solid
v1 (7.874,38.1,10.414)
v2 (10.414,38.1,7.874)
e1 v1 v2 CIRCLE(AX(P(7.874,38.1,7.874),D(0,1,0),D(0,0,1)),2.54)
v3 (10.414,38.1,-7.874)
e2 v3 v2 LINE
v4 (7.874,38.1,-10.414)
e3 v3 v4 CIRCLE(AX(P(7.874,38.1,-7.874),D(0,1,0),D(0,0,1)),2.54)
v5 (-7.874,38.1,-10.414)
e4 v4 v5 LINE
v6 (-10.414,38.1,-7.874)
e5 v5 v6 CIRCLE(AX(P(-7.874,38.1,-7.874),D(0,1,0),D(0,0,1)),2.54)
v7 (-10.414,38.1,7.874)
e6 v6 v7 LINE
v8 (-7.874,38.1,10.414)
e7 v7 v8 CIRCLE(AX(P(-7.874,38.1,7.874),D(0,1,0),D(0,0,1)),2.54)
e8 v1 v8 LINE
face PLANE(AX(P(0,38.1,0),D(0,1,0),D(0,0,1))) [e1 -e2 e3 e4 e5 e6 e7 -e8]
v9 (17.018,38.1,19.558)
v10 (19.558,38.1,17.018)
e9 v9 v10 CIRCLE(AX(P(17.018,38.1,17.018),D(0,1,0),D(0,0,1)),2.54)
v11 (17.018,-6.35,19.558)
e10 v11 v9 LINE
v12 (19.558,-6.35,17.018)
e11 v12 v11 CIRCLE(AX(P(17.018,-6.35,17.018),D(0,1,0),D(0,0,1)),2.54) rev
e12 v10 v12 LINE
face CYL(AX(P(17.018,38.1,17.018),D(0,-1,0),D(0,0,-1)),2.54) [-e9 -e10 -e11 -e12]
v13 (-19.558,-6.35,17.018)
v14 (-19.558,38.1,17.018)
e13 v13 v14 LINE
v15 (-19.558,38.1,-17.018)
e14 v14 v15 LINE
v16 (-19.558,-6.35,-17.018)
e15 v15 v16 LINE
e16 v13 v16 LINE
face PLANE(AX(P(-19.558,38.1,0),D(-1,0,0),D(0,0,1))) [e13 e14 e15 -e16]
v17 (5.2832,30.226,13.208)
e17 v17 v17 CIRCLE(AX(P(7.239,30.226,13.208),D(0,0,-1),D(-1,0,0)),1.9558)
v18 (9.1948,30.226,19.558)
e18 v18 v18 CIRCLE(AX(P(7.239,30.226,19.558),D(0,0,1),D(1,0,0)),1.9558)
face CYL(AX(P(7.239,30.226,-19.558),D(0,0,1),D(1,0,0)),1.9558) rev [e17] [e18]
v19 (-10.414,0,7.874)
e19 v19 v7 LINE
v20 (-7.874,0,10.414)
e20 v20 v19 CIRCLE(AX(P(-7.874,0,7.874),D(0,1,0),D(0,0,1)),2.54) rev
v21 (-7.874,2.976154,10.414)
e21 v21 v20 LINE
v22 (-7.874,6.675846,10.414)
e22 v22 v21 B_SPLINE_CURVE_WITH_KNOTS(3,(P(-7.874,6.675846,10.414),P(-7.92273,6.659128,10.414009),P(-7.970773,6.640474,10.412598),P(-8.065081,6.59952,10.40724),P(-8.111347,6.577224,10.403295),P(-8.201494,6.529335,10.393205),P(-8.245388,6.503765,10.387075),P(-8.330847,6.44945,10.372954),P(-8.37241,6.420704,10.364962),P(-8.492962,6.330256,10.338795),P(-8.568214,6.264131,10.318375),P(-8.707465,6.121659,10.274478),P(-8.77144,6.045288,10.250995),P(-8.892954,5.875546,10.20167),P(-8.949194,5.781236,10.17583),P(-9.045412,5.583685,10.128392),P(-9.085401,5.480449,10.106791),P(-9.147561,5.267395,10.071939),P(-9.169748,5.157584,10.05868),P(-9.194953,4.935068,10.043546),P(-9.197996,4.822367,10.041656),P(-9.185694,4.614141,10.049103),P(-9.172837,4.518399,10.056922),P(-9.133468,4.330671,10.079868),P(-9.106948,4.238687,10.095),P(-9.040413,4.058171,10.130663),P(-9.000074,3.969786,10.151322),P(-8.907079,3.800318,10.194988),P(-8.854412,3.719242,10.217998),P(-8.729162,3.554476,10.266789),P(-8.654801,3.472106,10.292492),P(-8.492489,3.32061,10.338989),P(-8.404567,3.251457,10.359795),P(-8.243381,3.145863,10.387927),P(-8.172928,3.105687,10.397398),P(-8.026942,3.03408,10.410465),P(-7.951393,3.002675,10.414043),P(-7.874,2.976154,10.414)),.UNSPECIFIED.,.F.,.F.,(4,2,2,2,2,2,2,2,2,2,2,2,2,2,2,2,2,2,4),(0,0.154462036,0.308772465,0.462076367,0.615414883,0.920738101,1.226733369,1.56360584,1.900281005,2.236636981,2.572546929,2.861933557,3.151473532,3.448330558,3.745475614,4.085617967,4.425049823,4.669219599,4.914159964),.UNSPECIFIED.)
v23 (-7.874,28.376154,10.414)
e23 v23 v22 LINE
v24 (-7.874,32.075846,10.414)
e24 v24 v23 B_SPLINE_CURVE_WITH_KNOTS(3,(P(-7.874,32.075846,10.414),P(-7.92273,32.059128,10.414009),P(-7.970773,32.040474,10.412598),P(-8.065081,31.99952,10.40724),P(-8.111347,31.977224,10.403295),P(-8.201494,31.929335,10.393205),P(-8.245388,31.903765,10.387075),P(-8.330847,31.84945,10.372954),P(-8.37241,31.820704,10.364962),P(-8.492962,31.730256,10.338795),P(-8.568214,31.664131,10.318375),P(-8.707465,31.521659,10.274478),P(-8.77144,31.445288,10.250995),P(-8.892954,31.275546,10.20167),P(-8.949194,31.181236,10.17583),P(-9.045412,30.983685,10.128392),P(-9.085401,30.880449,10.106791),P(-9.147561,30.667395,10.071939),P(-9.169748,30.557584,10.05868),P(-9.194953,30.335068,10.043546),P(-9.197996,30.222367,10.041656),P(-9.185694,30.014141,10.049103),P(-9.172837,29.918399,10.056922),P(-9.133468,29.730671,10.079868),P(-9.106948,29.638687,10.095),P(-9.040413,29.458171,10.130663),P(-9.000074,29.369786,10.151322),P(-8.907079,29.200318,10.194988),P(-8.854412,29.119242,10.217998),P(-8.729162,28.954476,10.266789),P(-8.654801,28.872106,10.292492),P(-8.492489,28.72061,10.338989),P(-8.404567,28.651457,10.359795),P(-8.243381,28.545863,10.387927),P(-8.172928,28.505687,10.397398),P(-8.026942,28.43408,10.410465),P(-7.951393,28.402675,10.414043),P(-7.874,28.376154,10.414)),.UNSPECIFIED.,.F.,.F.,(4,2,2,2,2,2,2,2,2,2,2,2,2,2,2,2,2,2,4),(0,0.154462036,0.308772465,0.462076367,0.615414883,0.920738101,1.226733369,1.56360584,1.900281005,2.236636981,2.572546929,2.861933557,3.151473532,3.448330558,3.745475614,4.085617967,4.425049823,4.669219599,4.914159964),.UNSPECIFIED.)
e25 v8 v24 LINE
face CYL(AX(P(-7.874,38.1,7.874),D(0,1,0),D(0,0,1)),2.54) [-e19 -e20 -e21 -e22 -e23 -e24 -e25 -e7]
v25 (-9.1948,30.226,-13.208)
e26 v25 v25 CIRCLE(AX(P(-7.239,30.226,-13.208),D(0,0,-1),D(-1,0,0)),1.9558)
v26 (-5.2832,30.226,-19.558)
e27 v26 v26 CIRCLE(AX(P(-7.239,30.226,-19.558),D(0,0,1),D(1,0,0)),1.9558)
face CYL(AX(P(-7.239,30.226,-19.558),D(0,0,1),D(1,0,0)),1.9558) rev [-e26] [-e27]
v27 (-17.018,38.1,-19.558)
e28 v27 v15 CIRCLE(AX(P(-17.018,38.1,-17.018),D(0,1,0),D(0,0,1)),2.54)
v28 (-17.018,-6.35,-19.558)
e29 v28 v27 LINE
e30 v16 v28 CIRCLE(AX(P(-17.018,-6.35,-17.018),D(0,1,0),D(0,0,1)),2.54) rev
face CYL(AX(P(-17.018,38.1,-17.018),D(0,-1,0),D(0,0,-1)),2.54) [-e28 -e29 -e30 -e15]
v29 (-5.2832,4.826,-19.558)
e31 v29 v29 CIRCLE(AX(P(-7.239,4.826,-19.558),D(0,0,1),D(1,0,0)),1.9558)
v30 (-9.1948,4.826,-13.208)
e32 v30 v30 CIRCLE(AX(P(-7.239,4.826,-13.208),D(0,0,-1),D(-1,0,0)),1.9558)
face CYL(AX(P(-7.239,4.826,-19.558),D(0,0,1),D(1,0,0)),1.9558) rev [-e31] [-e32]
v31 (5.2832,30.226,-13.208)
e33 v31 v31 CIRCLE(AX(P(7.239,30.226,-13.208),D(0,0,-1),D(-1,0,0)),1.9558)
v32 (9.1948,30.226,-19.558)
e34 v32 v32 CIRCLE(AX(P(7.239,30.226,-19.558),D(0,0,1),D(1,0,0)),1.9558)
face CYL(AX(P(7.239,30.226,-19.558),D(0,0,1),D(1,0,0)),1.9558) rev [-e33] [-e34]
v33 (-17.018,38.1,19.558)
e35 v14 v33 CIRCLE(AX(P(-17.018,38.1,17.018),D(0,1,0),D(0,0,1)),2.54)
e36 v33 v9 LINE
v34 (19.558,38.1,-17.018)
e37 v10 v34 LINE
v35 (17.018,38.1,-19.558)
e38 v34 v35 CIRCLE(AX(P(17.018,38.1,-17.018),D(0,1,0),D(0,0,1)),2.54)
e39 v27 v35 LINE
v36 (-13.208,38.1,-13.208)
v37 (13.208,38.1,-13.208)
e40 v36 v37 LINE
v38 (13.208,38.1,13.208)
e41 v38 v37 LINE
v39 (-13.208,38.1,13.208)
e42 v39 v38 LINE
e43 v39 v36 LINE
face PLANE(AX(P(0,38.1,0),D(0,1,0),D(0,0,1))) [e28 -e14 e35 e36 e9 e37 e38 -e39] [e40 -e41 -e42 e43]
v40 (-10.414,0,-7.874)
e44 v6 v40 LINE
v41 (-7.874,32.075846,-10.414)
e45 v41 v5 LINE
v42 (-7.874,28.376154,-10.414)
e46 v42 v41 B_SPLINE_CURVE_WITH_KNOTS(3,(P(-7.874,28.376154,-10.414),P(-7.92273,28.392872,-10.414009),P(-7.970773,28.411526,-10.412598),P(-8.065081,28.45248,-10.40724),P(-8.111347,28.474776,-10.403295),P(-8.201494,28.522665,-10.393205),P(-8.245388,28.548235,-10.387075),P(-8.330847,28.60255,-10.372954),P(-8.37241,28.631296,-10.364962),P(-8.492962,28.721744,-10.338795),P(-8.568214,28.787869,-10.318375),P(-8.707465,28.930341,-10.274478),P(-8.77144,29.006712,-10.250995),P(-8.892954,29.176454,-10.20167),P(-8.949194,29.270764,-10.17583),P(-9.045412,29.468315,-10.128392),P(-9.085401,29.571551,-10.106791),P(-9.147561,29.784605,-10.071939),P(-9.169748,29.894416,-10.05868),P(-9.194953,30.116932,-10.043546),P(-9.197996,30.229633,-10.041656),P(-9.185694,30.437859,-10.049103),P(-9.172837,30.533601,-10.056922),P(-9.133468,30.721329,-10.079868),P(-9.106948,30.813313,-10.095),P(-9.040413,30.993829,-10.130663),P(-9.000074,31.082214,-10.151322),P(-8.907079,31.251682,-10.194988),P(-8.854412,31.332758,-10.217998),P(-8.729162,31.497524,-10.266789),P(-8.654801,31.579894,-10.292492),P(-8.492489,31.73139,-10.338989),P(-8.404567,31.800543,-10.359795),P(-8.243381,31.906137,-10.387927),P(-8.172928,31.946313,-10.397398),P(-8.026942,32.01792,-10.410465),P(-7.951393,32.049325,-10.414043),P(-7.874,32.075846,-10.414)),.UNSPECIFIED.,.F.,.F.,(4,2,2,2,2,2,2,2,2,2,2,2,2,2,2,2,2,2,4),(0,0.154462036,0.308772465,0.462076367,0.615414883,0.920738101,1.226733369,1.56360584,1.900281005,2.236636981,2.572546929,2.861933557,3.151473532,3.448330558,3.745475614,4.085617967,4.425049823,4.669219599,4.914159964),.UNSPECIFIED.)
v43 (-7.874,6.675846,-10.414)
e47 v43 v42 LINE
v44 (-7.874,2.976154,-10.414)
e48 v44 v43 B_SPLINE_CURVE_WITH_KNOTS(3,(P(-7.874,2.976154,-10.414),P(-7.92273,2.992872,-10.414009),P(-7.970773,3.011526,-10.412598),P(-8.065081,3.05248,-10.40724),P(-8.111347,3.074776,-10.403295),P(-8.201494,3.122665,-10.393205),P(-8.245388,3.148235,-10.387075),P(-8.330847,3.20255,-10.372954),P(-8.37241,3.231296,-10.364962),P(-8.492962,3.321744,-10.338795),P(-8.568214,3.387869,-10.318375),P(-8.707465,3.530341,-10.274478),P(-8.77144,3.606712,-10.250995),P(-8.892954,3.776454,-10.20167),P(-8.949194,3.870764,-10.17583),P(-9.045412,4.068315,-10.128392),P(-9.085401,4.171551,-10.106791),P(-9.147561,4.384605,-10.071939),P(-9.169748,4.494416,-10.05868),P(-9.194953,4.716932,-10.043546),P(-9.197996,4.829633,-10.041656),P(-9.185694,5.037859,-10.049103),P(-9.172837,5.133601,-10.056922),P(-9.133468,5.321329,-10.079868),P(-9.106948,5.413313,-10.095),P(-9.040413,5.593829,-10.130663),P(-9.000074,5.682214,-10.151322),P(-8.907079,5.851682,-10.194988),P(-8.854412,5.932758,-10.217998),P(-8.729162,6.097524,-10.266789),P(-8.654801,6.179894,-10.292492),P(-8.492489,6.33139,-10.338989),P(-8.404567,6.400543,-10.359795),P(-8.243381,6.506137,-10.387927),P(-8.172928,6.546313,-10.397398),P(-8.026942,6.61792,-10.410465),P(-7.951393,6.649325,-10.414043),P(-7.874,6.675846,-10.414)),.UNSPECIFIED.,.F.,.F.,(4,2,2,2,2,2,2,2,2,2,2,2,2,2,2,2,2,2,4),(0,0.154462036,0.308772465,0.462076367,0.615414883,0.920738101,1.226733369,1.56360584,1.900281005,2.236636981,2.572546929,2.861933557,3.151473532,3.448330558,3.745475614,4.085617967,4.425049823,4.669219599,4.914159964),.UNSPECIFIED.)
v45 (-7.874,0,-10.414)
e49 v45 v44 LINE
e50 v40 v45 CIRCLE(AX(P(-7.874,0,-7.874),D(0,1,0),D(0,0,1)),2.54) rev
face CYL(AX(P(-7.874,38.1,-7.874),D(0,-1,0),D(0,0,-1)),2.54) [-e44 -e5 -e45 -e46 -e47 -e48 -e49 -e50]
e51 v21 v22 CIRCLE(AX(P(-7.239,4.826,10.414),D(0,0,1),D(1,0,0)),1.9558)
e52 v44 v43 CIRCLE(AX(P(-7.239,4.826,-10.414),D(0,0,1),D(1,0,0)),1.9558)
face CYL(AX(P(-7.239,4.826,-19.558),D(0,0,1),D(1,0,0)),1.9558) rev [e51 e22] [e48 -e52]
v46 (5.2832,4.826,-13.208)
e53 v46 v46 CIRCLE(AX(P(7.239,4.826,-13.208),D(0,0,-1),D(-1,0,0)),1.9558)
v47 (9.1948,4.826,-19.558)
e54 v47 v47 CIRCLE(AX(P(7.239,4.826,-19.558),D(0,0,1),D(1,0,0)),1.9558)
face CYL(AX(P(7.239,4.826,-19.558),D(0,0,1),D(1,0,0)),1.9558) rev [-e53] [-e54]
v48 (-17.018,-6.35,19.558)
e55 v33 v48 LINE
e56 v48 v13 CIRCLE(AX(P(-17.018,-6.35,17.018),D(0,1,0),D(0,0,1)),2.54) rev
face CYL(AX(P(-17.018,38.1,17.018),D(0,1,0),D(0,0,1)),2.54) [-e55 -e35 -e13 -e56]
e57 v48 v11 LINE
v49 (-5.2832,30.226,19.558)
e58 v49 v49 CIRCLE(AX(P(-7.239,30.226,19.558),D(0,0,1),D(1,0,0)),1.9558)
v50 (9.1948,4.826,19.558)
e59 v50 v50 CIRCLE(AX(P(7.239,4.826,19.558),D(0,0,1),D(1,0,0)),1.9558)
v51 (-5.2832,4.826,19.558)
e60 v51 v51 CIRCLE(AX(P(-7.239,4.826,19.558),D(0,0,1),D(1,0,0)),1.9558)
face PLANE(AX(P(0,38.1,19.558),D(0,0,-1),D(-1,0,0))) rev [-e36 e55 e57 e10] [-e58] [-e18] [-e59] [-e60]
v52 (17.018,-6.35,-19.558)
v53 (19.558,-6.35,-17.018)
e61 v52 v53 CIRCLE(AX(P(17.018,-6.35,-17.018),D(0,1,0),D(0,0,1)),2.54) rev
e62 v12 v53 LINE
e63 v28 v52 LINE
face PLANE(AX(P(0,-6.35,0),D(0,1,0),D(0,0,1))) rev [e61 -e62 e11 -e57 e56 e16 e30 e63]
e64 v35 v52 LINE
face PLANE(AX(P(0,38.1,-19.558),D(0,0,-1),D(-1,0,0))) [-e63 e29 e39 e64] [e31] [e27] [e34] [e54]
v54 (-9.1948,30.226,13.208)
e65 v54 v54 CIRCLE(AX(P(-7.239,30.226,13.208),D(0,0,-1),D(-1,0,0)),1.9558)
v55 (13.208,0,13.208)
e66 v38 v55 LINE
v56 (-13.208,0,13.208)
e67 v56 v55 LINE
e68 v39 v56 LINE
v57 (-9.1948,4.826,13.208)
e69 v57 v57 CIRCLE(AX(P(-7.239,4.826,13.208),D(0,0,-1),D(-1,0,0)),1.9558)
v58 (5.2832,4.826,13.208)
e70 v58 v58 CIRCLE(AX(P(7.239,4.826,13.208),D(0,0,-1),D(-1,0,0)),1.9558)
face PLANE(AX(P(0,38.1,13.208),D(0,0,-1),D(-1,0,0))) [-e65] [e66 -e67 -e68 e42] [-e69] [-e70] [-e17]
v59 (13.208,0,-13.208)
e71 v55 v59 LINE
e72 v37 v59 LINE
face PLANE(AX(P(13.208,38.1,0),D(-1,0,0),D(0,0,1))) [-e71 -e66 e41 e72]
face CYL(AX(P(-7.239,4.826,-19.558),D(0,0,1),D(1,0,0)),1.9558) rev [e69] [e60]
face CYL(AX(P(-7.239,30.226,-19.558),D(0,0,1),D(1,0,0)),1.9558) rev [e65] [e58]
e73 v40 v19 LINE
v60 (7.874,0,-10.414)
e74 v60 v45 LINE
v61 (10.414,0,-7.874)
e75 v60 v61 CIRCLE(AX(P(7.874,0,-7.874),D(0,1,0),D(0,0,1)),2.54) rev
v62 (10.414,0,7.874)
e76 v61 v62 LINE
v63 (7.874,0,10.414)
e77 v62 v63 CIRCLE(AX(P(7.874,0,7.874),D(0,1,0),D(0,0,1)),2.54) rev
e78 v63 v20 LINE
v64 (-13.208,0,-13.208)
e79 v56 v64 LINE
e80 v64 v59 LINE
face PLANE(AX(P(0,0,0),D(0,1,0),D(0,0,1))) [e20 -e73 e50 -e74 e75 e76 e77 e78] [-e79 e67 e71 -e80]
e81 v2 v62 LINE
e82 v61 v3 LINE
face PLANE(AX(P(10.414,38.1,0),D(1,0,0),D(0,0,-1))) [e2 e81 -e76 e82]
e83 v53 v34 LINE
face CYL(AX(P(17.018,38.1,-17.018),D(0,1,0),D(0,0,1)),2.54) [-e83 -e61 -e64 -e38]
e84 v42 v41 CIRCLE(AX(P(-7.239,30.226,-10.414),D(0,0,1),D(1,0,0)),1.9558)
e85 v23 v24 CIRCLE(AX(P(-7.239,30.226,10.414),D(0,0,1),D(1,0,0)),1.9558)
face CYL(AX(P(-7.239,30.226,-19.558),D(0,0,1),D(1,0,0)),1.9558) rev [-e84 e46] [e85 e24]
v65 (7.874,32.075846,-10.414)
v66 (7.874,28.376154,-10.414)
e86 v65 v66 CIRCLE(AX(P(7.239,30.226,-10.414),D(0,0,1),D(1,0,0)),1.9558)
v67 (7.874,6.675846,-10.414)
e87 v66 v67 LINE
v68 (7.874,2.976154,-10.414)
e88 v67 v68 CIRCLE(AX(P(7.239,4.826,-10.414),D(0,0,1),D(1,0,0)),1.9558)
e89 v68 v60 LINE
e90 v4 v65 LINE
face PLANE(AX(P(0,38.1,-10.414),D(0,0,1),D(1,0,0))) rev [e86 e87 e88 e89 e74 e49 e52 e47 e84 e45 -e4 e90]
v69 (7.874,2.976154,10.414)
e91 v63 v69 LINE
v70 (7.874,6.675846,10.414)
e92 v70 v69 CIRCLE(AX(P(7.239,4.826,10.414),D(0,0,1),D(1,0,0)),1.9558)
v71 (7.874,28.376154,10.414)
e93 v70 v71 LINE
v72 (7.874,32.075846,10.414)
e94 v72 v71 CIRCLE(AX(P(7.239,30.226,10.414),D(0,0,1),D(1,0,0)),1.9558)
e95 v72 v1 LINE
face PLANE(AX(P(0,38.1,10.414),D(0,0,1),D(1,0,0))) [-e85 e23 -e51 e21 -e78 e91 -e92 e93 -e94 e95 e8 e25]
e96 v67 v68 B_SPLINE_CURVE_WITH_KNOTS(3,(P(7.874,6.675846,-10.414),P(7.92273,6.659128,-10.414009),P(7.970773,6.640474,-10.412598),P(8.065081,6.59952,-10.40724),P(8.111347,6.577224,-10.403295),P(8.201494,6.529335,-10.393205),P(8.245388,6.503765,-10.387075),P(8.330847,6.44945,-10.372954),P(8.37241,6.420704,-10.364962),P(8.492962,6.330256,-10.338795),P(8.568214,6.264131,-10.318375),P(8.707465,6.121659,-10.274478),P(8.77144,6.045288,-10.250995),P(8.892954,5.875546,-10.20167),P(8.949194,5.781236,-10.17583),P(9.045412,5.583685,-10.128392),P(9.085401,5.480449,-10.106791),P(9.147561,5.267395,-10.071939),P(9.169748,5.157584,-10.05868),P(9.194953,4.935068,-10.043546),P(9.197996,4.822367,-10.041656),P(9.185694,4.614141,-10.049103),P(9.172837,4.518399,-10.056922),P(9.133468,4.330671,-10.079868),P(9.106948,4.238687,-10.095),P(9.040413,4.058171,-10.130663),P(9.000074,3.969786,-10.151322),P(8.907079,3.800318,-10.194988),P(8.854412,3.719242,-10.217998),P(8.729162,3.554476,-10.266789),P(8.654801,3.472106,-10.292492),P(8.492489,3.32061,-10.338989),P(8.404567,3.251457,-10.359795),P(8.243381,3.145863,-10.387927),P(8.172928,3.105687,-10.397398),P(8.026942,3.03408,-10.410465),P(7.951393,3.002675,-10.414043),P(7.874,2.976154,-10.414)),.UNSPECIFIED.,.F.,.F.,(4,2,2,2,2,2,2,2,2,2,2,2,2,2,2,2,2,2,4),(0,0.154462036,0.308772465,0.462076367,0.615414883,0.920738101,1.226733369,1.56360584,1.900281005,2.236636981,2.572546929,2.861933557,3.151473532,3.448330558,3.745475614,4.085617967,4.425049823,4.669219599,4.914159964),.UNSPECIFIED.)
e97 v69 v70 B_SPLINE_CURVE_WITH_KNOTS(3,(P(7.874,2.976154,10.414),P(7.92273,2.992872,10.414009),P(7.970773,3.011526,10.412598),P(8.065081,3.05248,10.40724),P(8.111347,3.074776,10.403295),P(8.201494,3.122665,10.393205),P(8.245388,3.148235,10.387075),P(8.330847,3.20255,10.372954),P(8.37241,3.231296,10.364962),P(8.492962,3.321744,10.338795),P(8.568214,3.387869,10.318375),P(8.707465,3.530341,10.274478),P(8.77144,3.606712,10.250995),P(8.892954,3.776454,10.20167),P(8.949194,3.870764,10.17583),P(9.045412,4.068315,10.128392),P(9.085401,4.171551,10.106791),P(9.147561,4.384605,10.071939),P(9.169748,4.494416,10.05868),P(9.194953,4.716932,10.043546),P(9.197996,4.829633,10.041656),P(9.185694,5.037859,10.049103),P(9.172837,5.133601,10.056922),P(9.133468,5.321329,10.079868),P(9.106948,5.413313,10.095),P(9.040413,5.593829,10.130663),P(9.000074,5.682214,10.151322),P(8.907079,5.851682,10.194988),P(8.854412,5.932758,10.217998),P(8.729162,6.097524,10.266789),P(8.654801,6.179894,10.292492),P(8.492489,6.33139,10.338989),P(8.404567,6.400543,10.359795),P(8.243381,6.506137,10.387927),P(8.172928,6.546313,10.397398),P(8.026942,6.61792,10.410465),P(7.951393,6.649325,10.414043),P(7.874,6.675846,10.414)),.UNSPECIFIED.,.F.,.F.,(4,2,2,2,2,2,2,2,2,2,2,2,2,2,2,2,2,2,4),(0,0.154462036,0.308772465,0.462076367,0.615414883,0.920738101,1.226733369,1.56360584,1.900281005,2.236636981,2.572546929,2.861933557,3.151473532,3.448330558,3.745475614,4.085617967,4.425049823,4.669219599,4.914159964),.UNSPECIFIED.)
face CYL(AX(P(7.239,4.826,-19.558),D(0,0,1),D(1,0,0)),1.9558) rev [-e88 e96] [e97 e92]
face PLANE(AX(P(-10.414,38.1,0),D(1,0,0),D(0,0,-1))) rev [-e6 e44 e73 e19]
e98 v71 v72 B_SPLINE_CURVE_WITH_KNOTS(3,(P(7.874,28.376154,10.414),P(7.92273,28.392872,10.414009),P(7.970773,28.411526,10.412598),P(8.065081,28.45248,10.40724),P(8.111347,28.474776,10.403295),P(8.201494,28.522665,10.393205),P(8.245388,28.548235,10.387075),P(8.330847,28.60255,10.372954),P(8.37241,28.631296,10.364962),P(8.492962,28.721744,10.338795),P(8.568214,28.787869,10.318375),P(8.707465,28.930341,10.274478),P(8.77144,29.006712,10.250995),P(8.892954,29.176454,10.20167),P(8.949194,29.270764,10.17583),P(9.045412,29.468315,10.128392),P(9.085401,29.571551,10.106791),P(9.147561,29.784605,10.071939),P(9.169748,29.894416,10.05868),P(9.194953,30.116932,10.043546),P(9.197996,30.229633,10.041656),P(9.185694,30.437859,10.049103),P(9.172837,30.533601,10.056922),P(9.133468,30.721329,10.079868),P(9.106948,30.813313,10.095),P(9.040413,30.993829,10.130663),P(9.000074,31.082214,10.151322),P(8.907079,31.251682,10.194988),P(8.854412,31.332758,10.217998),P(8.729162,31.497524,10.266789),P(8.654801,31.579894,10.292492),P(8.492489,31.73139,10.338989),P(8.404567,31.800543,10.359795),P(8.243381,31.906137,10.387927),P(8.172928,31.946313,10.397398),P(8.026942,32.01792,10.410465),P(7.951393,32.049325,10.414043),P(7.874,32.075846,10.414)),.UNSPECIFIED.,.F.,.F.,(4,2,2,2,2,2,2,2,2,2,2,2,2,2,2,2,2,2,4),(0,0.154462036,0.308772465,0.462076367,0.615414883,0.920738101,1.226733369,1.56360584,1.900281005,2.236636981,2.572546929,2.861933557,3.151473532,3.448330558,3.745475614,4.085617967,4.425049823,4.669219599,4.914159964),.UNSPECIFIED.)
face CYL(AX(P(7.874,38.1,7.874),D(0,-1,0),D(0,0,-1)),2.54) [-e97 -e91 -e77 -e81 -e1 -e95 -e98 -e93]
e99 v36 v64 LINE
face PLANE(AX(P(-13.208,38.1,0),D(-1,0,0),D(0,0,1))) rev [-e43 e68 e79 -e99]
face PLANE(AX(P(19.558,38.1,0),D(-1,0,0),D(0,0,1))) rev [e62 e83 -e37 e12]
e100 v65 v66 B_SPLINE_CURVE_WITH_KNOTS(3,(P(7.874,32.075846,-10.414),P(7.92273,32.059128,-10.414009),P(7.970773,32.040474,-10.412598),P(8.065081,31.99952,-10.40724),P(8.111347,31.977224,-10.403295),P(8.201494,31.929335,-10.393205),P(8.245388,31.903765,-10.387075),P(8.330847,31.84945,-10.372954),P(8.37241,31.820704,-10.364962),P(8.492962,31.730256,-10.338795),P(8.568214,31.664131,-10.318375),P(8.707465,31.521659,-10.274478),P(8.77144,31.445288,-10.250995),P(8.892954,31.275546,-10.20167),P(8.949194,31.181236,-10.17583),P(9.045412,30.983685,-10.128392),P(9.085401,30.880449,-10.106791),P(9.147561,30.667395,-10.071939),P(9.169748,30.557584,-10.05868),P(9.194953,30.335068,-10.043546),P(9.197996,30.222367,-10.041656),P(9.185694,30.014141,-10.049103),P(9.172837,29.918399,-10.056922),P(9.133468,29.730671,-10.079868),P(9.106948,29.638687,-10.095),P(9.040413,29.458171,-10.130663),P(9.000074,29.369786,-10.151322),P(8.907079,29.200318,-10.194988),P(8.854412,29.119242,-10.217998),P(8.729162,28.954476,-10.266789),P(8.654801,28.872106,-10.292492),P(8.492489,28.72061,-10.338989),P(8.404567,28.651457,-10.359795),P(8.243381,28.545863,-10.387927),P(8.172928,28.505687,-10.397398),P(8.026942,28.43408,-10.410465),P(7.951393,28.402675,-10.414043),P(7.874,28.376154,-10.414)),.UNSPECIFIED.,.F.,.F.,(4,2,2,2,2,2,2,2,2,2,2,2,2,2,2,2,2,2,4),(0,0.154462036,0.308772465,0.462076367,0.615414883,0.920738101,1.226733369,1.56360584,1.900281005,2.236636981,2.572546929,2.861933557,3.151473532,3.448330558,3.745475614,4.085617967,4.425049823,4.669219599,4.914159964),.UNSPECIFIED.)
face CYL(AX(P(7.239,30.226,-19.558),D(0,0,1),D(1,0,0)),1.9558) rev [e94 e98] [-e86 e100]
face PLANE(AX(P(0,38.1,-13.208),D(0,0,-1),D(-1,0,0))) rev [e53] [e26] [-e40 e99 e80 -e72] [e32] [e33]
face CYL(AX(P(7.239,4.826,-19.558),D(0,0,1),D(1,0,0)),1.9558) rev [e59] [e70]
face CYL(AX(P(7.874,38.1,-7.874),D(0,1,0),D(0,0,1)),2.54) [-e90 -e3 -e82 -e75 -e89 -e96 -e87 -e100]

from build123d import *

# Parameters (mm, degrees)
SKETCH1_W             = 20.828
SKETCH1_H             = 20.828
BOSS_EXTRUDE1_DEPTH   = 38.1
SKETCH1_W_2           = 39.116
SKETCH1_H_2           = 39.116
SKETCH1_W_3           = 26.416
SKETCH1_H_3           = 26.416
BOSS_EXTRUDE1_2_DEPTH = 38.1
SKETCH2_R             = 1.9558
CUT_EXTRUDE1_DEPTH    = 59.001610495
SKETCH1_2_W           = 39.116
SKETCH1_2_H           = 39.116
SKETCH1_2_W_2         = 26.416
SKETCH1_2_H_2         = 26.416
SKETCH1_2_W_3         = 20.828
SKETCH1_2_H_3         = 20.828
BOSS_EXTRUDE2_DEPTH   = 6.35
FILLET1_R             = 2.54


with BuildPart() as part:
    # Sketch1 → Boss-Extrude1 (new body)
    with BuildSketch(Plane(origin=(0, 0, 0), x_dir=(1, 0, 0), z_dir=(0, 1, 0))):
        Rectangle(SKETCH1_W, SKETCH1_H)
    extrude(amount=BOSS_EXTRUDE1_DEPTH)


with BuildPart() as body_2:
    # Sketch1 → Boss-Extrude1 2 (new body)
    with BuildSketch(Plane(origin=(0, 0, 0), x_dir=(1, 0, 0), z_dir=(0, 1, 0))):
        Rectangle(SKETCH1_W_2, SKETCH1_H_2)
        Rectangle(SKETCH1_W_3, SKETCH1_H_3, mode=Mode.SUBTRACT)
    extrude(amount=BOSS_EXTRUDE1_2_DEPTH)


with BuildPart() as cut_extrude1_tool:
    # Sketch2 → Cut-Extrude1 (new, through all)
    with BuildSketch(Plane.XY.offset(19.558)):
        with Locations((-7.239, 30.226)):
            Circle(SKETCH2_R)
        with Locations((7.239, 30.226)):
            Circle(SKETCH2_R)
        with Locations((7.239, 4.826)):
            Circle(SKETCH2_R)
        with Locations((-7.239, 4.826)):
            Circle(SKETCH2_R)
    extrude(amount=-CUT_EXTRUDE1_DEPTH)


with BuildPart() as part_1:
    add(part.part)

    # Cut-Extrude1: cut by cut_extrude1_tool
    add(cut_extrude1_tool.part, mode=Mode.SUBTRACT)



with BuildPart() as body_2_1:
    add(body_2.part)

    # Cut-Extrude1: cut by cut_extrude1_tool
    add(cut_extrude1_tool.part, mode=Mode.SUBTRACT)


with BuildPart() as part_2:
    add(part_1.part)

    add(body_2_1.part)  # Boss-Extrude2 merges body 2
    # Sketch1<2> → Boss-Extrude2 (add)
    # profile 1 of 3: a face of its own
    with BuildSketch(Plane(origin=(0, 0, 0), x_dir=(1, 0, 0), z_dir=(0, 1, 0))):
        Rectangle(SKETCH1_2_W, SKETCH1_2_H)
        Rectangle(SKETCH1_2_W_2, SKETCH1_2_H_2, mode=Mode.SUBTRACT)
    # profile 2 of 3: a face of its own
    with BuildSketch(Plane(origin=(0, 0, 0), x_dir=(1, 0, 0), z_dir=(0, 1, 0))):
        Rectangle(SKETCH1_2_W_2, SKETCH1_2_H_2)
        Rectangle(SKETCH1_2_W_3, SKETCH1_2_H_3, mode=Mode.SUBTRACT)
    # profile 3 of 3: a face of its own
    with BuildSketch(Plane(origin=(0, 0, 0), x_dir=(1, 0, 0), z_dir=(0, 1, 0))):
        Rectangle(SKETCH1_2_W_3, SKETCH1_2_H_3)
    extrude(amount=-BOSS_EXTRUDE2_DEPTH)

    # Fillet1
    # the kernel refuses this fillet: 2.54 mm, written as the material it takes off along each edge
    with BuildSketch(Plane(origin=(-19.558, 44.45, -19.558), x_dir=(0, 0, 1), z_dir=(0, -1, 0)), Plane(origin=(-19.558, -12.7, 19.558), x_dir=(0, 0, -1), z_dir=(0, 1, 0))) as fillet1_piece_1:
        with BuildLine():
            CenterArc((FILLET1_R, -FILLET1_R), FILLET1_R, 90, 90)
            Line((0, -FILLET1_R), (0, 0))
            Line((0, 0), (FILLET1_R, 0))
        make_face()
    extrude(amount=57.15, mode=Mode.SUBTRACT)
    with BuildSketch(Plane(origin=(19.558, 44.45, -19.558), x_dir=(0, 0, 1), z_dir=(0, -1, 0)), Plane(origin=(19.558, -12.7, 19.558), x_dir=(0, 0, -1), z_dir=(0, 1, 0))) as fillet1_piece_2:
        with BuildLine():
            CenterArc((FILLET1_R, FILLET1_R), FILLET1_R, 180, 90)
            Line((0, FILLET1_R), (0, 0))
            Line((0, 0), (FILLET1_R, 0))
        make_face()
    extrude(amount=57.15, mode=Mode.SUBTRACT)
    with BuildSketch(Plane(origin=(10.414, 0, -10.414), x_dir=(-1, 0, 0), z_dir=(0, 1, 0)), Plane(origin=(-10.414, 0, -10.414), x_dir=(0, 0, 1), z_dir=(0, 1, 0))) as fillet1_piece_3:
        with BuildLine():
            CenterArc((FILLET1_R, FILLET1_R), FILLET1_R, 180, 90)
            Line((0, FILLET1_R), (0, 0))
            Line((0, 0), (FILLET1_R, 0))
        make_face()
    extrude(amount=44.45, mode=Mode.SUBTRACT)
    with BuildSketch(Plane(origin=(-10.414, 0, 10.414), x_dir=(0, 0, -1), z_dir=(0, 1, 0)), Plane(origin=(10.414, 0, 10.414), x_dir=(-1, 0, 0), z_dir=(0, 1, 0))) as fillet1_piece_4:
        with BuildLine():
            CenterArc((FILLET1_R, -FILLET1_R), FILLET1_R, 90, 90)
            Line((0, -FILLET1_R), (0, 0))
            Line((0, 0), (FILLET1_R, 0))
        make_face()
    extrude(amount=44.45, mode=Mode.SUBTRACT)


solid = part_2.part
